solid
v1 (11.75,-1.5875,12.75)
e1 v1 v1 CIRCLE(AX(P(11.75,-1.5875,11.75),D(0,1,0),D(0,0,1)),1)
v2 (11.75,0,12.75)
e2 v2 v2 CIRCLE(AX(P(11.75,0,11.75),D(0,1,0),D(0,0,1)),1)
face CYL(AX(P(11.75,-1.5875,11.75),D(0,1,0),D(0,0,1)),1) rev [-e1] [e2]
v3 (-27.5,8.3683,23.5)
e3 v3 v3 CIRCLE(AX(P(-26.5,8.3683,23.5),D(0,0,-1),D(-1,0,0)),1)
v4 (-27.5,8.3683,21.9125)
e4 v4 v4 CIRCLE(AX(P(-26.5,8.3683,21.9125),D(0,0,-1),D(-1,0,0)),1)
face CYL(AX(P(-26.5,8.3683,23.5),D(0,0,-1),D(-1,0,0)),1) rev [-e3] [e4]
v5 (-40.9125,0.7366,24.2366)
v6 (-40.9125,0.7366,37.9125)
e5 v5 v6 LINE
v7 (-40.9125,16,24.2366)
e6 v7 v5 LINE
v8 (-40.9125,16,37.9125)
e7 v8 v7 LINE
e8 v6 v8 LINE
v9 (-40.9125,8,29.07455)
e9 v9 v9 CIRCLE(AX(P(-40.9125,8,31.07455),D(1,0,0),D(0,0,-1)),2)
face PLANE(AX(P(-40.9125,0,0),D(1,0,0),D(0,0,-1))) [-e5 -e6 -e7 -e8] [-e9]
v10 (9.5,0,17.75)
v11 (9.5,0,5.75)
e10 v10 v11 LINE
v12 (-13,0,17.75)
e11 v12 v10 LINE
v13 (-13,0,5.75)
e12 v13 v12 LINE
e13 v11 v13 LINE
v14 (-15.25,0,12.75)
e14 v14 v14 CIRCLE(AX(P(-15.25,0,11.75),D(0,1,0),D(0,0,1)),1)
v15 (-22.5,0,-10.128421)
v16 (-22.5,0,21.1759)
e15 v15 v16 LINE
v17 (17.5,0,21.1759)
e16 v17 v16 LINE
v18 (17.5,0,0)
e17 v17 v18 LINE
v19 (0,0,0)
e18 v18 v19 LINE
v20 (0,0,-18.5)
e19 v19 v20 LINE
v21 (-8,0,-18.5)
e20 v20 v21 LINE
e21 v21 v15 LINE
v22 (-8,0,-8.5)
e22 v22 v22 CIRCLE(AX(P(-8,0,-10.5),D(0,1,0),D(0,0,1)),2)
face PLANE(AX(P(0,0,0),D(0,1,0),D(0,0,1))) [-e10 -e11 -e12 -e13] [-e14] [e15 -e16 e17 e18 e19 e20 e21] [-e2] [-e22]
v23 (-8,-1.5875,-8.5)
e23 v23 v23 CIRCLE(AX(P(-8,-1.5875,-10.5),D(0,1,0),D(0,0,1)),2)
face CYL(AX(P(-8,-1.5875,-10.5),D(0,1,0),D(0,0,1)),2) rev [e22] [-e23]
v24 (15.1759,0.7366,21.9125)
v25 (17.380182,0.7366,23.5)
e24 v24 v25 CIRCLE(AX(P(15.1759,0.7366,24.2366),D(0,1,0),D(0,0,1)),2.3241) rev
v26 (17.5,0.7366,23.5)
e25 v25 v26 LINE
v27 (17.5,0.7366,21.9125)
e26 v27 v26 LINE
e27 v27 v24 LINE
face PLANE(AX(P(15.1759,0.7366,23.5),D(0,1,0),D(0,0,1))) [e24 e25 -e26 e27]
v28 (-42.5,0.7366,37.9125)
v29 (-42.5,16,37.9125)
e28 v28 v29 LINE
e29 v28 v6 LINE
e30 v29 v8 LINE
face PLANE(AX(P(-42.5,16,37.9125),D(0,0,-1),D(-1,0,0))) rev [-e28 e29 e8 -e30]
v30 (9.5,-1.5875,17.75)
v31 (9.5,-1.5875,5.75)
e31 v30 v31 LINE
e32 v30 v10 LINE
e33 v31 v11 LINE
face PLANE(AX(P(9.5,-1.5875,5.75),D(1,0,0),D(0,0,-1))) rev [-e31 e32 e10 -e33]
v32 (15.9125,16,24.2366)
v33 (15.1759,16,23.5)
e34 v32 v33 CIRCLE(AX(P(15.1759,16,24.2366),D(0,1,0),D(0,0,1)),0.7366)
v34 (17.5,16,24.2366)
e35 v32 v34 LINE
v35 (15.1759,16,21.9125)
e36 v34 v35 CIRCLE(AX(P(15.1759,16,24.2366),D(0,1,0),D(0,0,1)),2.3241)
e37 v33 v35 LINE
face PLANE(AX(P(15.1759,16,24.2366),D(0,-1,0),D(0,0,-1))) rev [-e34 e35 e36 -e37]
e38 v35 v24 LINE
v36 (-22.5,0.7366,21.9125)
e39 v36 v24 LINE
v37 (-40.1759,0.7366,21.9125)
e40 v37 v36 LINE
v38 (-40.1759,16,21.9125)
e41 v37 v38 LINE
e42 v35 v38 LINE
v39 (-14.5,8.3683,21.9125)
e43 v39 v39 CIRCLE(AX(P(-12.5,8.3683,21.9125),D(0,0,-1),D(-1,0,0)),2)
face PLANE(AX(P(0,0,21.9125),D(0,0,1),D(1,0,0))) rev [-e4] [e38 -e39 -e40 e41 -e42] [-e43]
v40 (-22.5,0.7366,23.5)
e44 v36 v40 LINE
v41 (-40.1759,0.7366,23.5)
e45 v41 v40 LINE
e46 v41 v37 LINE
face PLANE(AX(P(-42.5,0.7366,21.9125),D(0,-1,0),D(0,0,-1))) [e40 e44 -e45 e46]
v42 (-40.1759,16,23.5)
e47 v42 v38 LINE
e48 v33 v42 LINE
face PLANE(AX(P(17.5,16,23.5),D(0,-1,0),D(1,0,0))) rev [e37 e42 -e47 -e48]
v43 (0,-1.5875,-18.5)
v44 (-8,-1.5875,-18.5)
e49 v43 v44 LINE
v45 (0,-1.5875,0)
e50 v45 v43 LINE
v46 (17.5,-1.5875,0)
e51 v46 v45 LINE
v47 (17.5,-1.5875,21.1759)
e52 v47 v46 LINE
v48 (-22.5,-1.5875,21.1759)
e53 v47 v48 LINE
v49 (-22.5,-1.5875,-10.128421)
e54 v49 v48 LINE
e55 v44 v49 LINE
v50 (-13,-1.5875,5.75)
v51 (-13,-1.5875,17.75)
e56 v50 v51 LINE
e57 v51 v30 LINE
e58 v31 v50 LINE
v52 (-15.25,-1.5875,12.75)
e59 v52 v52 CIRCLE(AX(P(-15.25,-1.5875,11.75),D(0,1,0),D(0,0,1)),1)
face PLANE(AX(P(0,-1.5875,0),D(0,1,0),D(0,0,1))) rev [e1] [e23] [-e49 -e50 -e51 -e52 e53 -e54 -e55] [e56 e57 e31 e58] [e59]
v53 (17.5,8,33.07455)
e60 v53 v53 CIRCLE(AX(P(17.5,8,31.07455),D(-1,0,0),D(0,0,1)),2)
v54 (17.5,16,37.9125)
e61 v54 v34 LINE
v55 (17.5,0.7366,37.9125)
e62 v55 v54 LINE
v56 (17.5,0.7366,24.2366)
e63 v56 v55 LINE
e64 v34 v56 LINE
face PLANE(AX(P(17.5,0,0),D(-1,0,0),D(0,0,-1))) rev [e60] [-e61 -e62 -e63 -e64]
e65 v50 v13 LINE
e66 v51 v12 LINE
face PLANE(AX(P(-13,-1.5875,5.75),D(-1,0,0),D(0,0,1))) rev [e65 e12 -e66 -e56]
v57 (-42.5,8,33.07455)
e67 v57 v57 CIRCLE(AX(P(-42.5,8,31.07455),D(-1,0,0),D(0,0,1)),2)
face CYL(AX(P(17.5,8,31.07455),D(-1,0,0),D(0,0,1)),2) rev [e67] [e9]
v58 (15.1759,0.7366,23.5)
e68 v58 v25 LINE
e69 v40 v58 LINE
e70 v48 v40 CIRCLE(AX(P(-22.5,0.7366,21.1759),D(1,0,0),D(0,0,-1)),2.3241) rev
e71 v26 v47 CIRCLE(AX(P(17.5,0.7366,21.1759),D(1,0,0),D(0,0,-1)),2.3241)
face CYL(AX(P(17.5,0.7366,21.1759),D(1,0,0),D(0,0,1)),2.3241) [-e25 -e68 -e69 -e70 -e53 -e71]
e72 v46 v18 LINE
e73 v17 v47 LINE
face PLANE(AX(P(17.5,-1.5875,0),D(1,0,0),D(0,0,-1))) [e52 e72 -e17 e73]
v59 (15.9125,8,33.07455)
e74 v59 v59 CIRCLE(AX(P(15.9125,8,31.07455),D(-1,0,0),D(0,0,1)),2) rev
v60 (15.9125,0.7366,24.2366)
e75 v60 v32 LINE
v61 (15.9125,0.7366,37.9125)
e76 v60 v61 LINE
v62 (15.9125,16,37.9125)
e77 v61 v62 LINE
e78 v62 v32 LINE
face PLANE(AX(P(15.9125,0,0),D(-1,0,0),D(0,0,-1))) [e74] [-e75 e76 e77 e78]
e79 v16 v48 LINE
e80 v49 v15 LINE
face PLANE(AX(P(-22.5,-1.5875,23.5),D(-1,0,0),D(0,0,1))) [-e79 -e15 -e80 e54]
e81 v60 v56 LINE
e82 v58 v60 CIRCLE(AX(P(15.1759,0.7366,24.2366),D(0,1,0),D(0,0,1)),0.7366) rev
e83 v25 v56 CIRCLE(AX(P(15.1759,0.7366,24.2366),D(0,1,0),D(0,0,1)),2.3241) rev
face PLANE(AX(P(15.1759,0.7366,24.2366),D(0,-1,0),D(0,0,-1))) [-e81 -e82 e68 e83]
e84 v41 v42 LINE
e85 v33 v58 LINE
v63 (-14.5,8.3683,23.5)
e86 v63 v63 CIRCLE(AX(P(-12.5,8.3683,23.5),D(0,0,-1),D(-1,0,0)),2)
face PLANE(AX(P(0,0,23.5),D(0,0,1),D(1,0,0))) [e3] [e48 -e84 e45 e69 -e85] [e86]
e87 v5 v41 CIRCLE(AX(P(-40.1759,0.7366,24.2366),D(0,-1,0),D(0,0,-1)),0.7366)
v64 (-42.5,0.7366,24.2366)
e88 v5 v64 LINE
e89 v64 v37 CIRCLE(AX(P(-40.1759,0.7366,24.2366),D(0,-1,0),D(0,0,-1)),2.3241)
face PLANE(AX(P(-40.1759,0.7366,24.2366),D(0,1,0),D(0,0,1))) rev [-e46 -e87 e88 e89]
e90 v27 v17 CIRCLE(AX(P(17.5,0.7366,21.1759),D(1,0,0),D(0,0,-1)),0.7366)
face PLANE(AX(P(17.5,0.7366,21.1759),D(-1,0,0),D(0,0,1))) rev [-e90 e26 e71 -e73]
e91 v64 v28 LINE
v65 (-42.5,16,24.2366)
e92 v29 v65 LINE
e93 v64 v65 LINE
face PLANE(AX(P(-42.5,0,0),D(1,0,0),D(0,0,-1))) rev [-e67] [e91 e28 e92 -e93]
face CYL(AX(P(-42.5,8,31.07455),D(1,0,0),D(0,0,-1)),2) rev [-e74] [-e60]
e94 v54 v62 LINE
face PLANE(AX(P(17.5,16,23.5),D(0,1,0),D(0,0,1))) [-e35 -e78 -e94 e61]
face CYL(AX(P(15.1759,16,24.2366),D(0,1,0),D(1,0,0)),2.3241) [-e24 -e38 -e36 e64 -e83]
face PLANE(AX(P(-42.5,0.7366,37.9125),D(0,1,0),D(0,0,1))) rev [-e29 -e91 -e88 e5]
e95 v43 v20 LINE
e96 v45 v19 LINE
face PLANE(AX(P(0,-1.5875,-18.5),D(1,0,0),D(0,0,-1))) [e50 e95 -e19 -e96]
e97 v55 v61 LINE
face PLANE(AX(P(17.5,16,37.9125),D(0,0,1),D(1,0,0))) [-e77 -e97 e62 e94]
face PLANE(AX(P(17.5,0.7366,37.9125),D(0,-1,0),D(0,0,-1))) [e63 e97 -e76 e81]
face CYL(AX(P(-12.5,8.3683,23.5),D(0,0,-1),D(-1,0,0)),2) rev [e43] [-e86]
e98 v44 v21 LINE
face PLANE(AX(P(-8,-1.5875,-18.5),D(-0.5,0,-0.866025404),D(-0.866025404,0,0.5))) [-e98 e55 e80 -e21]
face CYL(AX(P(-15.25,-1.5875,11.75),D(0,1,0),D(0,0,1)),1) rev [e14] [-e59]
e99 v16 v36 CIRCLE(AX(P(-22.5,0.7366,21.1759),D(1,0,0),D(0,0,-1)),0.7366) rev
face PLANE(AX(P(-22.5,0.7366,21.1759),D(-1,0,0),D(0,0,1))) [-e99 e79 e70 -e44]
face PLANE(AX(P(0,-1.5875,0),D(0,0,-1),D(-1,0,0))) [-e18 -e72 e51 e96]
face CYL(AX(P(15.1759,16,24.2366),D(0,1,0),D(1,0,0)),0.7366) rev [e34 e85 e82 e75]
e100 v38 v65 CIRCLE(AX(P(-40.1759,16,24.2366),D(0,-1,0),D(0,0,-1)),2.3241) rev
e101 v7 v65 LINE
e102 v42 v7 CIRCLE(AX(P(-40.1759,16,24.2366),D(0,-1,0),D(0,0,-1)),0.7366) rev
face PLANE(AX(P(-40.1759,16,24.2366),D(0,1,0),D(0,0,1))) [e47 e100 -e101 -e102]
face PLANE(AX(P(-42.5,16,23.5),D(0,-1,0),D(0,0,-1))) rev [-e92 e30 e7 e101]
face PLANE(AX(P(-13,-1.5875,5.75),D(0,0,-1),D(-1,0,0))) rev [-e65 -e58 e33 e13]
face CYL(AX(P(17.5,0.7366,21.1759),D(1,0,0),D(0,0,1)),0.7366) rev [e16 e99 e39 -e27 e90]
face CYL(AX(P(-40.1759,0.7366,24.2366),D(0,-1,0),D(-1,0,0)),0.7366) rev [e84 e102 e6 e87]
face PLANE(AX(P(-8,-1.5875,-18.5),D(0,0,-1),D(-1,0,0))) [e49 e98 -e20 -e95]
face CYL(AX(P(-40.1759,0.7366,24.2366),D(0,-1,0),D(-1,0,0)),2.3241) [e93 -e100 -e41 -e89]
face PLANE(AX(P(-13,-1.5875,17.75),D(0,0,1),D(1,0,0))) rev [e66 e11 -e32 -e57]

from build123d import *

# Parameters (mm, degrees)
SKETCH1_R                    = 2
SKETCH1_R_2                  = 1
SKETCH1_W                    = 22.5
SKETCH1_H                    = 12
BASE_FLANGE1_DEPTH           = 1.5875
EDGE_FLANGE1_STRIP_W         = 7.8232
EDGE_FLANGE1_STRIP_H         = 1.5875
EDGE_FLANGE1_STRIP_CUT_DEPTH = 40
EDGE_FLANGE1_DEPTH           = 40
EDGE_FLANGE1_PROFILE_W       = 60
EDGE_FLANGE1_PROFILE_H       = 15.2634
EDGE_FLANGE1_FLAT_DEPTH      = 1.5875
SKETCH11_R                   = 2
SKETCH11_R_2                 = 1
CUT_EXTRUDE1_DEPTH           = 61.789967563
EDGE_FLANGE2_STRIP_W         = 7.8232
EDGE_FLANGE2_STRIP_H         = 1.5875
EDGE_FLANGE2_STRIP_CUT_DEPTH = 15.2634
EDGE_FLANGE2_DEPTH           = 15.2634
SKETCH15_R                   = 2
CUT_EXTRUDE2_DEPTH           = 73.755464786


# Sheet-metal steps are written as plain solids
with BuildPart() as part:
    # Sketch1 → Base-Flange1 (new body)
    with BuildSketch(Plane(origin=(0, 0, 0), x_dir=(1, 0, 0), z_dir=(0, 1, 0))):
        Polygon((0, 0), (17.5, 0), (17.5, -23.5), (-22.5, -23.5), (-22.5, 10.128421097), (-8, 18.5), (0, 18.5), align=None)
        with Locations(Location((-8, 10.5, 0), (0, 0, 270))):
            Circle(SKETCH1_R, mode=Mode.SUBTRACT)
        with Locations(Location((11.75, -11.75, 0), (0, 0, 270))):
            Circle(SKETCH1_R_2, mode=Mode.SUBTRACT)
        with Locations(Location((-15.25, -11.75, 0), (0, 0, 270))):
            Circle(SKETCH1_R_2, mode=Mode.SUBTRACT)
        with Locations((-1.75, -11.75)):
            Rectangle(SKETCH1_W, SKETCH1_H, mode=Mode.SUBTRACT)
    extrude(amount=-BASE_FLANGE1_DEPTH)

    # Edge-Flange1 strip (across the edge) → Edge-Flange1 strip cut (cut)
    with BuildSketch(Plane(origin=(-22.5, 0, 23.5), x_dir=(0, 0, -1), z_dir=(1, 0, 0))):
        with Locations((-1.5875, -0.79375)):
            Rectangle(EDGE_FLANGE1_STRIP_W, EDGE_FLANGE1_STRIP_H)
    extrude(amount=EDGE_FLANGE1_STRIP_CUT_DEPTH, mode=Mode.SUBTRACT)

    # Edge-Flange1 bend section (across the edge) → Edge-Flange1 (add)
    with BuildSketch(Plane(origin=(-22.5, 0, 23.5), x_dir=(0, 0, -1), z_dir=(1, 0, 0))):
        with BuildLine():
            Line((0, 0.7366), (1.5875, 0.7366))
            ThreePointArc((1.5875, 0.7366), (1.803245145, 0.215745145), (2.3241, 0))
            Line((2.3241, 0), (2.3241, -1.5875))
            ThreePointArc((2.3241, -1.5875), (0.68071313, -0.90678687), (0, 0.7366))
        make_face()
    extrude(amount=EDGE_FLANGE1_DEPTH)

    # Edge-Flange1 profile (on flange) → Edge-Flange1 flat (add)
    with BuildSketch(Plane.XY.offset(23.5)):
        with Locations((-12.5, 8.3683)):
            Rectangle(EDGE_FLANGE1_PROFILE_W, EDGE_FLANGE1_PROFILE_H)
    extrude(amount=-EDGE_FLANGE1_FLAT_DEPTH)

    # Sketch11 → Cut-Extrude1 (cut, through all)
    with BuildSketch(Plane(origin=(0, 0, 21.9125), x_dir=(-1, 0, 0), z_dir=(0, 0, -1))):
        with Locations((12.5, 8.3683)):
            Circle(SKETCH11_R)
        with Locations((26.5, 8.3683)):
            Circle(SKETCH11_R_2)
    extrude(amount=-CUT_EXTRUDE1_DEPTH, mode=Mode.SUBTRACT)

    # Edge-Flange2 strip (across the edge) → Edge-Flange2 strip cut (cut)
    with BuildSketch(Plane(origin=(-42.5, 16, 23.5), x_dir=(1, 0, 0), z_dir=(0, -1, 0))):
        with Locations((-1.5875, -0.79375)):
            Rectangle(EDGE_FLANGE2_STRIP_W, EDGE_FLANGE2_STRIP_H)
    edge_flange2_strip_cut = extrude(amount=EDGE_FLANGE2_STRIP_CUT_DEPTH, mode=Mode.SUBTRACT)

    # Edge-Flange2 section (across the edge) → Edge-Flange2 (add)
    with BuildSketch(Plane(origin=(-42.5, 16, 23.5), x_dir=(1, 0, 0), z_dir=(0, -1, 0))):
        with BuildLine():
            Line((0, 0.7366), (0, 14.4125))
            Line((0, 14.4125), (1.5875, 14.4125))
            Line((1.5875, 14.4125), (1.5875, 0.7366))
            ThreePointArc((1.5875, 0.7366), (1.803245145, 0.215745145), (2.3241, 0))
            Line((2.3241, 0), (2.3241, -1.5875))
            ThreePointArc((2.3241, -1.5875), (0.68071313, -0.90678687), (0, 0.7366))
        make_face()
    edge_flange2 = extrude(amount=EDGE_FLANGE2_DEPTH)

    # Sketch15 → Cut-Extrude2 (cut, through all)
    with BuildSketch(Plane.ZY.offset(42.5)):
        with Locations((31.07455, 8)):
            Circle(SKETCH15_R)
    cut_extrude2 = extrude(amount=-CUT_EXTRUDE2_DEPTH, mode=Mode.SUBTRACT)

    # Mirror1: Edge-Flange2 strip cut, Edge-Flange2, Cut-Extrude2 across plane
    add(edge_flange2_strip_cut.mirror(Plane.ZY.offset(12.5)), mode=Mode.SUBTRACT)
    add(edge_flange2.mirror(Plane.ZY.offset(12.5)))
    add(cut_extrude2.mirror(Plane.ZY.offset(12.5)), mode=Mode.SUBTRACT)


solid = part.part
